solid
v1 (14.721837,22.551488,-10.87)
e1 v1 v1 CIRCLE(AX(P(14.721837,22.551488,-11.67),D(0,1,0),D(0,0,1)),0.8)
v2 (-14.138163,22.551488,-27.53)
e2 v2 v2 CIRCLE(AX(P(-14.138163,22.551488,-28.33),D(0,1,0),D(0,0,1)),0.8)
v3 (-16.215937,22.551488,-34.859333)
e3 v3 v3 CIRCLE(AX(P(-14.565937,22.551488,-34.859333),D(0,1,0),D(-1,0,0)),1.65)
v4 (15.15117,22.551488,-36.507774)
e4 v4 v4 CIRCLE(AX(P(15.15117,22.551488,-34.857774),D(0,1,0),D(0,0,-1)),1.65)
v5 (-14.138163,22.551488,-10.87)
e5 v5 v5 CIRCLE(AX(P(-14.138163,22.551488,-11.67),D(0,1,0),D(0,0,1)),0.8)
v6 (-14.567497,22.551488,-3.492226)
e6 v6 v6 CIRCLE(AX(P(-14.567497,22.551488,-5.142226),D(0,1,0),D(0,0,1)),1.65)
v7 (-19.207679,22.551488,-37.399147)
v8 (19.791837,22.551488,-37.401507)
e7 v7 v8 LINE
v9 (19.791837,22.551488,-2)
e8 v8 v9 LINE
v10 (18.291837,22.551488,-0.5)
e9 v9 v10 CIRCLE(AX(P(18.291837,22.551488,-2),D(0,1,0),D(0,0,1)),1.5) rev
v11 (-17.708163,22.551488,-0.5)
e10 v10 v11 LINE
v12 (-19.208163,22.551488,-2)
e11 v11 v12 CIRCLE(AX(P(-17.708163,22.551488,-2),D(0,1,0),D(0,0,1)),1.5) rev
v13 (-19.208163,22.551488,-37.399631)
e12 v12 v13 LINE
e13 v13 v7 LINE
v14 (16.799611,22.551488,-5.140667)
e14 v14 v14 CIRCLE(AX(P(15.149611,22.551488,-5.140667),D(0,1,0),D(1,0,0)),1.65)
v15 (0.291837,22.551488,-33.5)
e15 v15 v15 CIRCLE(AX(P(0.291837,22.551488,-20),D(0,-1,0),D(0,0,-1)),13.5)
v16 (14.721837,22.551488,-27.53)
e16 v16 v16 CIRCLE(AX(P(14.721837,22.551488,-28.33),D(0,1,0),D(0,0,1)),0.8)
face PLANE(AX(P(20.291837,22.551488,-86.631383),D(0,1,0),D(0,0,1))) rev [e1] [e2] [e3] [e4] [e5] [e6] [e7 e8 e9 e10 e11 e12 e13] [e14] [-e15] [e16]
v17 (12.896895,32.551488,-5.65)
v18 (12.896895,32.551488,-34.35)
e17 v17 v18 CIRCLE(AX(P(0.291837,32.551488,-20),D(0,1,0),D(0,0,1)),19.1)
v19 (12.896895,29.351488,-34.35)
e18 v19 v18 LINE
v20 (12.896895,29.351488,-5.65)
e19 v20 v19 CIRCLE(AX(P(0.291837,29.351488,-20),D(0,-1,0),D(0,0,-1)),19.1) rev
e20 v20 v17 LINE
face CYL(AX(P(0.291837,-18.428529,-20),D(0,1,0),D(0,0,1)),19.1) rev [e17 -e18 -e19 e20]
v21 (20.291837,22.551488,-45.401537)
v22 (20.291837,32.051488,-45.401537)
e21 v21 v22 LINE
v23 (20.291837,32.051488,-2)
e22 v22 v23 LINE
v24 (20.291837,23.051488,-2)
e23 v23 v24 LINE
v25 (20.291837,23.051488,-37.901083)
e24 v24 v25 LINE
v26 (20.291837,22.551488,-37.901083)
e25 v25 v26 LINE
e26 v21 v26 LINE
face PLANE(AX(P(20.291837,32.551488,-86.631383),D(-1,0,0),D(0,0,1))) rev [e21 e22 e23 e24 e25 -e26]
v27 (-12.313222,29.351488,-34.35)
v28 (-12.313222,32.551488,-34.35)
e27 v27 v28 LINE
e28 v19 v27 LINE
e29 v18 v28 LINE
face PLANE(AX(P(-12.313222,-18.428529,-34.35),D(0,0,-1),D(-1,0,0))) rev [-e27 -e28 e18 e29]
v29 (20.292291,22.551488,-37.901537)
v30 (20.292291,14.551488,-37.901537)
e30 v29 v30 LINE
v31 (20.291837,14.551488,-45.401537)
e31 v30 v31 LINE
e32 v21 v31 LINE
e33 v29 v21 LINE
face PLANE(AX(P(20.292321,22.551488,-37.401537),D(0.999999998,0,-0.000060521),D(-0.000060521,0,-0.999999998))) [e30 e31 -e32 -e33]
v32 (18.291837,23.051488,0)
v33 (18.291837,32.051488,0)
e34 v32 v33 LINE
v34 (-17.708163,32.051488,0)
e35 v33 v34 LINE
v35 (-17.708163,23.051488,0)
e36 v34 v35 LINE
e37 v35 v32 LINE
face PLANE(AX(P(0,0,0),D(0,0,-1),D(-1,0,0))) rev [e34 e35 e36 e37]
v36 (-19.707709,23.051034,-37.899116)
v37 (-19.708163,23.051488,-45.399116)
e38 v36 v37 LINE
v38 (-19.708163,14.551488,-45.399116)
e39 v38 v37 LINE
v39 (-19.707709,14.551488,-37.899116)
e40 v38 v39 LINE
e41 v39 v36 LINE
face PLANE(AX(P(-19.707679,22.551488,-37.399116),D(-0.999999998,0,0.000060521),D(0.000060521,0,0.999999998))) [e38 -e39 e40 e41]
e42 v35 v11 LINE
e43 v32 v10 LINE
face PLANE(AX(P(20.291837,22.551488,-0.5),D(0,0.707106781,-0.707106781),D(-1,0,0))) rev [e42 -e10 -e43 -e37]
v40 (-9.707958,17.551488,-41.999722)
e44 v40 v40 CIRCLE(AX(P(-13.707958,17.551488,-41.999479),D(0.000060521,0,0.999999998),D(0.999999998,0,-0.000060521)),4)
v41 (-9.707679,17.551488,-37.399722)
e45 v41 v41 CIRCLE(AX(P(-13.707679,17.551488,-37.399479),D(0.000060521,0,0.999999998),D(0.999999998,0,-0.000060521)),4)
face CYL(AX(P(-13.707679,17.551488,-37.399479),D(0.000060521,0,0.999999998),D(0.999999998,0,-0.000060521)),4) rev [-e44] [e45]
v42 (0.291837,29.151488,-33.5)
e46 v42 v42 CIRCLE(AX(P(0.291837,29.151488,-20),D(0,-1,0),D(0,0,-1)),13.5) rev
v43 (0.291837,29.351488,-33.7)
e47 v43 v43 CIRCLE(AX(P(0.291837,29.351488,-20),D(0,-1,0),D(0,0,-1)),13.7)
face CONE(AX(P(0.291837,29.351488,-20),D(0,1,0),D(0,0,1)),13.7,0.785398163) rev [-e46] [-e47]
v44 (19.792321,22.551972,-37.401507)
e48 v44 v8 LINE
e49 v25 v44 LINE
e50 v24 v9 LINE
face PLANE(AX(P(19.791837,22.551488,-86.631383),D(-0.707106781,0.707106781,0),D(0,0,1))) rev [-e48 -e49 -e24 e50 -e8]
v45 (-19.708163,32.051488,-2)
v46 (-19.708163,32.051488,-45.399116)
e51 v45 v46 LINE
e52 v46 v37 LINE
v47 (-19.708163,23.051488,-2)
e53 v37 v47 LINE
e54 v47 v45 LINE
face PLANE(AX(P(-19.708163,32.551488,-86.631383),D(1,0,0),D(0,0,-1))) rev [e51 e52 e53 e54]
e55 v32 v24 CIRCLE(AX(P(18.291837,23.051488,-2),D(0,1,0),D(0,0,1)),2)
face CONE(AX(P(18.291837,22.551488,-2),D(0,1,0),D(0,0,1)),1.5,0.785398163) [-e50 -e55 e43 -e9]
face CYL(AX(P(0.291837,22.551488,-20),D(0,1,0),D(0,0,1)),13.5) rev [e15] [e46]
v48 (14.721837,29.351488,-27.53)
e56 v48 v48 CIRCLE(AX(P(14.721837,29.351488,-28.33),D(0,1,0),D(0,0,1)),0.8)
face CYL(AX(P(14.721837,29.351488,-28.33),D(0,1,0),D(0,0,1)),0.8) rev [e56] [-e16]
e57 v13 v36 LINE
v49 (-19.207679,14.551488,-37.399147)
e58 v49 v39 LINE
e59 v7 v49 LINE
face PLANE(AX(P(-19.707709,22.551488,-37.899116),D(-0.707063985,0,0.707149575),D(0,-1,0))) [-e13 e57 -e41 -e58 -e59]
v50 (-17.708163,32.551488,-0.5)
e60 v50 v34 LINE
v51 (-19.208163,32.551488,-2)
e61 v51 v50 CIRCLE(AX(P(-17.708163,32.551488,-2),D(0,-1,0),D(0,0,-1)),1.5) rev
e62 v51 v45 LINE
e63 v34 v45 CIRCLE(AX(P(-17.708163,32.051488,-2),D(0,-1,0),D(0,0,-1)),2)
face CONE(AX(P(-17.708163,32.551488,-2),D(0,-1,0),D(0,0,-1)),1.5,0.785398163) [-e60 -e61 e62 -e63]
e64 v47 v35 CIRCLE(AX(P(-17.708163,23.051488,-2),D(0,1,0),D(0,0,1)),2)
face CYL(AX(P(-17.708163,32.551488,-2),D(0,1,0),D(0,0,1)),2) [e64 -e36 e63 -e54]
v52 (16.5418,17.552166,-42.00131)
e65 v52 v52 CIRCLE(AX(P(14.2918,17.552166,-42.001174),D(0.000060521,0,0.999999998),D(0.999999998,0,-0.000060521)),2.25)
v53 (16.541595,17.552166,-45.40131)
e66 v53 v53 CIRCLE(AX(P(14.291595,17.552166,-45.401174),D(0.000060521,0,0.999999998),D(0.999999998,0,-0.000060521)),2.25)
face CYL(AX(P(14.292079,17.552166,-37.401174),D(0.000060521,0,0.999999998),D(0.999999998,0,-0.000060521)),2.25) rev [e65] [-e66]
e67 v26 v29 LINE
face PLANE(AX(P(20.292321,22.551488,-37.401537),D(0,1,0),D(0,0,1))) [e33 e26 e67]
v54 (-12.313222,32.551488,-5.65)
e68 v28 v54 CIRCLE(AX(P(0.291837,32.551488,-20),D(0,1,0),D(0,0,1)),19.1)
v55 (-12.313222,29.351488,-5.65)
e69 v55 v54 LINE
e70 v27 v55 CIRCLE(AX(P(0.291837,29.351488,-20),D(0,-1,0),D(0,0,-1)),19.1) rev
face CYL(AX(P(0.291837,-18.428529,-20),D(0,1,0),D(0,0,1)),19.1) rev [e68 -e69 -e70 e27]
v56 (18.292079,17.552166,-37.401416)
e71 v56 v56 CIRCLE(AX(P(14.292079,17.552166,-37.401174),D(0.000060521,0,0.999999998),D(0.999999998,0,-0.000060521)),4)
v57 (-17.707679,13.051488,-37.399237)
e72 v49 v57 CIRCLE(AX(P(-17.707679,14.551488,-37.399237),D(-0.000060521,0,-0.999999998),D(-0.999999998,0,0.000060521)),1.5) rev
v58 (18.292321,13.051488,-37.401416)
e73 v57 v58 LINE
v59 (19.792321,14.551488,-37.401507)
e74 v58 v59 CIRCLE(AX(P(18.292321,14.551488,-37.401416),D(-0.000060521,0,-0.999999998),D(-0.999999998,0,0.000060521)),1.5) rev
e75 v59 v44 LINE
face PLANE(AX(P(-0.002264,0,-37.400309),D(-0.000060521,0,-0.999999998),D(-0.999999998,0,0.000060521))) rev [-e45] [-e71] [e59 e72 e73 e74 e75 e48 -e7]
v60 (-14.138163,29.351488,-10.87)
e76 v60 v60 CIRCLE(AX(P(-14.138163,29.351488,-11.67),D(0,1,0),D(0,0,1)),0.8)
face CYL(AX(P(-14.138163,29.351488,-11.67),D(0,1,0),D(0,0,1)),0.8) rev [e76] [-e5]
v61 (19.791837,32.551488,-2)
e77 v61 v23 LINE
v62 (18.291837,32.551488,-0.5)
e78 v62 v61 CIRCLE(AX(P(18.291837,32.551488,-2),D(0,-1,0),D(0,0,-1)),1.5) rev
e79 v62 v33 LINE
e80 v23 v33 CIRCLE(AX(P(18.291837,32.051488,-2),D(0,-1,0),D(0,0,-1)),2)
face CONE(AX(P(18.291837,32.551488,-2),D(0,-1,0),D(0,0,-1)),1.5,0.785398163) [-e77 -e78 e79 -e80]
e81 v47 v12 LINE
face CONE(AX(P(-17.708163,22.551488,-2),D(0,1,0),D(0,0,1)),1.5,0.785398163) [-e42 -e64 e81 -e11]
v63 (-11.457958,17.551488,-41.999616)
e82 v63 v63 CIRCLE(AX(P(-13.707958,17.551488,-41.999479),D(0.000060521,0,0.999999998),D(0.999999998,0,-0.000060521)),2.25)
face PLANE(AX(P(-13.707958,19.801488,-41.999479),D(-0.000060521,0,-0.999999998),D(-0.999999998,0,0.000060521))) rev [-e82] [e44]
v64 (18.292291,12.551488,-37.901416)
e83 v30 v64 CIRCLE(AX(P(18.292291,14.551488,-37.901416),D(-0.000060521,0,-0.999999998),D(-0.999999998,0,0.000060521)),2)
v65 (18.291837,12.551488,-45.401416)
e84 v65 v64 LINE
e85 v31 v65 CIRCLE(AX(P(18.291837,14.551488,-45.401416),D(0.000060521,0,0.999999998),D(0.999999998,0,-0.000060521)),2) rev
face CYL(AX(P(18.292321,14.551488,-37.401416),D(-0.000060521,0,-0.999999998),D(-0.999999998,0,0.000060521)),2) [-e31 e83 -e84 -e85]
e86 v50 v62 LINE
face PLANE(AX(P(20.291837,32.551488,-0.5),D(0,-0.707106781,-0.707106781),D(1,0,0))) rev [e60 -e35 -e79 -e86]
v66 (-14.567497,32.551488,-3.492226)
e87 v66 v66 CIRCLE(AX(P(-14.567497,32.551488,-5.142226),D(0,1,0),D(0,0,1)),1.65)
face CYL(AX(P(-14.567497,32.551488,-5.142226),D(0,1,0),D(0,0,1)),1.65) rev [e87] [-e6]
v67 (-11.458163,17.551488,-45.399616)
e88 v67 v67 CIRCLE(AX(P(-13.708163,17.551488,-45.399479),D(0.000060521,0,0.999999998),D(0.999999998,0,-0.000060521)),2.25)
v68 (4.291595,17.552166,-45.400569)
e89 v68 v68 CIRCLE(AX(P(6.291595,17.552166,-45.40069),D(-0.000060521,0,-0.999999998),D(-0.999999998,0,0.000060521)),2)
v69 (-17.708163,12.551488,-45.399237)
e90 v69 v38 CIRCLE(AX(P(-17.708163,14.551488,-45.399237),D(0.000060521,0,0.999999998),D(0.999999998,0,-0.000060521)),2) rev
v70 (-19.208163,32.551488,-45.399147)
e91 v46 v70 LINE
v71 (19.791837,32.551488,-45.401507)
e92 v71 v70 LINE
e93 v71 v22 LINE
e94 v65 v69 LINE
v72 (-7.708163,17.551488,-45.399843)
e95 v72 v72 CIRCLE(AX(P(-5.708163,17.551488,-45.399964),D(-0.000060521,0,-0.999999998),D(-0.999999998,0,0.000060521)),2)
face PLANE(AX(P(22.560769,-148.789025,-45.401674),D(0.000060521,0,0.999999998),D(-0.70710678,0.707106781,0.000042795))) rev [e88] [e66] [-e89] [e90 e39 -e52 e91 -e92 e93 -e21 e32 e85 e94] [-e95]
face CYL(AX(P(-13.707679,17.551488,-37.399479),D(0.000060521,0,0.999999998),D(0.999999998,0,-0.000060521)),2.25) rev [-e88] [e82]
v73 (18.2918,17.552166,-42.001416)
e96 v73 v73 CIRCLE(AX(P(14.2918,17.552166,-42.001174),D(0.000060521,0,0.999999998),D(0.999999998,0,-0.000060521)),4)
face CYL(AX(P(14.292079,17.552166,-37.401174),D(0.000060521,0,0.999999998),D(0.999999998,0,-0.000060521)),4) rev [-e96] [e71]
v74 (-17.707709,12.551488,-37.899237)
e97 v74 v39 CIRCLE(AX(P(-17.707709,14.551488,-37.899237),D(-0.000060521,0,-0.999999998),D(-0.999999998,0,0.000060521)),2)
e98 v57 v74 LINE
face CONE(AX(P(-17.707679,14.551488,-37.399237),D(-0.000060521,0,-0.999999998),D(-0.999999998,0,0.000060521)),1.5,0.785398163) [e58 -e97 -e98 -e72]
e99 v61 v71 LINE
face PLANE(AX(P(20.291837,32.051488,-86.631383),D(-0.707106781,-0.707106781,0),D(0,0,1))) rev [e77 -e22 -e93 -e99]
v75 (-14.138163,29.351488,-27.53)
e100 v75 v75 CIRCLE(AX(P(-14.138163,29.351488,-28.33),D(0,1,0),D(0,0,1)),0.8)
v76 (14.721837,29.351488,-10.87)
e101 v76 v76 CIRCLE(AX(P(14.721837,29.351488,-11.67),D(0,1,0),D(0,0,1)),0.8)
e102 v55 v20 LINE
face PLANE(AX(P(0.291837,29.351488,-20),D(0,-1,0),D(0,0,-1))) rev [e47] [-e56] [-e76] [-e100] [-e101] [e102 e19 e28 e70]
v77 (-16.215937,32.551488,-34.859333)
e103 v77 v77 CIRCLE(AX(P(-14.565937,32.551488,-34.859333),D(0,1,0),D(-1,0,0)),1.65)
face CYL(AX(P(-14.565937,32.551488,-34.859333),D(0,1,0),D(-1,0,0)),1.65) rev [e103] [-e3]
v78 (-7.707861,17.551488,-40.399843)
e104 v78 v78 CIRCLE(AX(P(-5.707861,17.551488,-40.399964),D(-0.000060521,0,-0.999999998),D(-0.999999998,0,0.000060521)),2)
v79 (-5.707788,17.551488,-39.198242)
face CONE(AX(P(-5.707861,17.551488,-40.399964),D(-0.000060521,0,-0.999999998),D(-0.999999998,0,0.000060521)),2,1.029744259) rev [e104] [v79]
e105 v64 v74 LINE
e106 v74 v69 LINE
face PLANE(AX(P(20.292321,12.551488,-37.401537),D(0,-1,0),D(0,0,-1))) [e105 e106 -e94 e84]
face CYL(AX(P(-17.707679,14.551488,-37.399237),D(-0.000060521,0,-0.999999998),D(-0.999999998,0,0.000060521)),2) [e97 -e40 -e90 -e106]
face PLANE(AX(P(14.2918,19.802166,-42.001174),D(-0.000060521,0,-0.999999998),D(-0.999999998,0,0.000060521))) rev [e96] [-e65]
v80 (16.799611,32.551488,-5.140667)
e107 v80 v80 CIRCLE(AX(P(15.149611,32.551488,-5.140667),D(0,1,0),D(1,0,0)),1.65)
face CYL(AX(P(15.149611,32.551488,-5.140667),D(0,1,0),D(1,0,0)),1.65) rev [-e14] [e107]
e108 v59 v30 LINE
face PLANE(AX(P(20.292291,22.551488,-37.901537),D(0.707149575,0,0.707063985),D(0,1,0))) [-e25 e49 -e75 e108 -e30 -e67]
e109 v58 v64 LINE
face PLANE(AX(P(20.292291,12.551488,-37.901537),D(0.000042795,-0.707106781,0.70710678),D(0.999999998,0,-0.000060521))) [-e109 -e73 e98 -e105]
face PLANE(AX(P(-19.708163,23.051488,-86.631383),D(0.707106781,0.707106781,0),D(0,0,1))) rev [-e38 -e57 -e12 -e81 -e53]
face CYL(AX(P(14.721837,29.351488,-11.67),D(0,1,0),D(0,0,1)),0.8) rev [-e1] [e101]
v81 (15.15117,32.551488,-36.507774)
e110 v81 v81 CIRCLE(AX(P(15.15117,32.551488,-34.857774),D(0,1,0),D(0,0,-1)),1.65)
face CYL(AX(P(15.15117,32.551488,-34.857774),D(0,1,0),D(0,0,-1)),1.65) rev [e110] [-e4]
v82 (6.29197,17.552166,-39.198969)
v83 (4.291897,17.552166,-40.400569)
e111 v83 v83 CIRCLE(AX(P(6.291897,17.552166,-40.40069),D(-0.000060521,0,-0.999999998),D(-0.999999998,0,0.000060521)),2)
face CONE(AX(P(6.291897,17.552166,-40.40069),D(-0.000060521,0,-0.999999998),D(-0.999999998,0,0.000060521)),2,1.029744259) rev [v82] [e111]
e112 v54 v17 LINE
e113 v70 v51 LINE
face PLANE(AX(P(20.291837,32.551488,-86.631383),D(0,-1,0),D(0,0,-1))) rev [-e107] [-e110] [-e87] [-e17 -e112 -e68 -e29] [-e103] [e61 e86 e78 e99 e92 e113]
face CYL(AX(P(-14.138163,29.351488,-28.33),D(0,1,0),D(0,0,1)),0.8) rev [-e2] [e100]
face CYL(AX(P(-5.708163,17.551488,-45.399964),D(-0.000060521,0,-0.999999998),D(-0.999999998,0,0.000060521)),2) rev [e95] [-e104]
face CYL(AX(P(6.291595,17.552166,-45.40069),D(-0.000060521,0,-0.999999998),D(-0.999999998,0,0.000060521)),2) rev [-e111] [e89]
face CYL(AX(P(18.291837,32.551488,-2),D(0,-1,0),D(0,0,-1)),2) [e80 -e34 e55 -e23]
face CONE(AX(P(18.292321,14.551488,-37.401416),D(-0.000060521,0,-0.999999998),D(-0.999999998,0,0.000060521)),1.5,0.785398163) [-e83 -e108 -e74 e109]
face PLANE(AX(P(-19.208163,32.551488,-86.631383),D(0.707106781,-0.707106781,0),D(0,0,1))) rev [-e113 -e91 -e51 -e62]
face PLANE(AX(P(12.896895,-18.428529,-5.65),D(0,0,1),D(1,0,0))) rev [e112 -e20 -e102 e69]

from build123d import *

# Parameters (mm, degrees)
EXTRUDE_START                = 22.551487981
EXTRUDE_1_DEPTH              = 10
SKETCH_3_R                   = 13.5
CUT_EXTRUDE_1_DEPTH          = 34.402382852
CUT_EXTRUDE_2_DEPTH          = 3.2
HOLE_WIZARD_M2_1_D           = 1.6
HOLE_WIZARD_M2_1_ON_FACE_2_D = 1.6
HOLE_WIZARD_M4_1_D           = 3.3
PATTERN_CIRCULAR_1_COUNT     = 4
FILLET_1_R                   = 2
CUT_EXTRUDE_3_DEPTH          = 3.2
SKETCH_14_W                  = 40.000000073
SKETCH_14_H                  = 10
EXTRUDE_3_DEPTH              = 8
HOLE_WIZARD_2_D              = 4.5
HOLE_WIZARD_2_CBORE_D        = 8
HOLE_WIZARD_2_CBORE_DEPTH    = 4.6
FILLET_3_R                   = 2
CHAMFER_3_SIZE               = 0.5
CHAMFER_4_SIZE               = 0.5
MM_1_D                       = 4
MM_1_DEPTH                   = 5
MM_1_TIP                     = 1.201721238
MM_1_ON_FACE_2_D             = 4
MM_1_ON_FACE_2_DEPTH         = 5
MM_1_ON_FACE_2_TIP           = 1.201721238
CHAMFER_5_SIZE               = 0.2


# Read off the part's stored shape, not the designer's step: 凸台-拉伸1
with BuildPart() as part:
    # 凸台-拉伸1 outline → 凸台-拉伸1 (new body)
    with BuildSketch(Plane(origin=(0, 0, 0), x_dir=(1, 0, 0), z_dir=(0, 1, 0)).offset(EXTRUDE_START)):
        Polygon((-19.708163337, 0), (20.291836663, 0), (20.291836663, 45.401537164), (-19.708163337, 45.399116322), align=None)
    extrude(amount=EXTRUDE_1_DEPTH)

    # 草图3 → 切除-拉伸1 (cut, through all)
    with BuildSketch(Plane(origin=(0, 32.551487981, -20.825928422), x_dir=(-1, 0, 0), z_dir=(0, -1, 0))):
        with Locations(Location((-0.291836663, -0.825928422, 0), (0, 0, 90))):
            Circle(SKETCH_3_R)
    extrude(amount=CUT_EXTRUDE_1_DEPTH, mode=Mode.SUBTRACT)

    # 草图6 → 切除-拉伸2 (cut)
    with BuildSketch(Plane(origin=(0, 32.551487981, -20.825928422), x_dir=(-1, 0, 0), z_dir=(0, -1, 0))):
        with BuildLine():
            Line((12.2943661, 13.474071578), (-12.878039427, 13.474071578))
            ThreePointArc((-12.878039427, 13.474071578), (-19.341836663, -0.825928422), (-12.878039427, -15.125928422))
            Line((-12.878039427, -15.125928422), (12.2943661, -15.125928422))
            ThreePointArc((12.2943661, -15.125928422), (18.758163337, -0.825928422), (12.2943661, 13.474071578))
        make_face()
    extrude(amount=CUT_EXTRUDE_2_DEPTH, mode=Mode.SUBTRACT)

    # M2 螺纹孔1 (through all)
    with Locations(Plane(origin=(14.721836663, 29.351487981, -11.67), x_dir=(0, 0, 1), z_dir=(0, 1, 0))):
        with Locations((0, 0), (-16.66, 0), (-16.66, -28.86), (0, -28.86)):
            Hole(HOLE_WIZARD_M2_1_D / 2)

    # M2 螺纹孔1 on face 2 (through all)
    with Locations(Plane(origin=(36.124820123, 11.946154634, 0), x_dir=(0, 0, 1), z_dir=(0, 1, 0))):
        with Locations((0, 0)):
            Hole(HOLE_WIZARD_M2_1_ON_FACE_2_D / 2)

    # M4 螺纹孔1 (through all)
    with Locations(Plane(origin=(-14.567496717, 32.551487981, -5.142225972), x_dir=(0, 0, 1), z_dir=(0, 1, 0))):
        with Locations((0, 0)):
            hole_wizard_m4_1 = Hole(HOLE_WIZARD_M4_1_D / 2)

    # 阵列(圆周)1: M4 螺纹孔1 ×4 about axis
    pattern_circular_1_axis = Axis((0.291836663, 0, -20), (0, 1, 0))
    for i in range(1, PATTERN_CIRCULAR_1_COUNT):
        add(hole_wizard_m4_1.rotate(pattern_circular_1_axis, i * 360 / PATTERN_CIRCULAR_1_COUNT), mode=Mode.SUBTRACT)

    # 圆角1
    fillet_1_edges = [part.edges().sort_by_distance(p)[0] for p in [
        (-19.708163337, 27.551487981, 0),
        (20.291836663, 27.551487981, 0),
    ]]
    fillet(fillet_1_edges, radius=FILLET_1_R)

    # 草图10 → 切除-拉伸3 (cut)
    with BuildSketch(Plane(origin=(0, 32.551487981, 0), x_dir=(1, 0, 0), z_dir=(0, 1, 0))):
        with BuildLine():
            Line((12.896895172, 5.65), (-12.313221845, 5.65))
            ThreePointArc((-12.313221845, 5.65), (-18.808163337, 20), (-12.313221845, 34.35))
            Line((-12.313221845, 34.35), (12.896895172, 34.35))
            ThreePointArc((12.896895172, 34.35), (19.391836663, 20), (12.896895172, 5.65))
        make_face()
        with BuildLine():
            Line((12.878039427, 5.7), (-12.2943661, 5.7))
            ThreePointArc((-12.2943661, 5.7), (-18.758163337, 20), (-12.2943661, 34.3))
            Line((-12.2943661, 34.3), (12.878039427, 34.3))
            ThreePointArc((12.878039427, 34.3), (19.341836663, 20), (12.878039427, 5.7))
        make_face(mode=Mode.SUBTRACT)
    extrude(amount=-CUT_EXTRUDE_3_DEPTH, mode=Mode.SUBTRACT)

    # 草图14 → 凸台-拉伸3 (add)
    with BuildSketch(Plane(origin=(-0.002747675, 0, -45.400308914), x_dir=(-0.999999998168601, 0, 6.0521054570844804e-05), z_dir=(-6.0521054570844804e-05, 0, -0.999999998168601))):
        with Locations((-0.294584339, 17.551487981)):
            Rectangle(SKETCH_14_W, SKETCH_14_H)
    extrude(amount=-EXTRUDE_3_DEPTH)

    # 打孔尺寸(%根据)内六角圆柱头螺钉的类型2 (through all)
    with Locations(Plane(origin=(-13.707679179, 17.551487981, -37.399479463), x_dir=(0.999999998169, 0, -6.0521055e-05), z_dir=(6.0521055e-05, 0, 0.999999998169))):
        with Locations((0, 0)):
            hole_wizard_2 = CounterBoreHole(HOLE_WIZARD_2_D / 2, HOLE_WIZARD_2_CBORE_D / 2, HOLE_WIZARD_2_CBORE_DEPTH)

    # 镜向1: 打孔尺寸(%根据)内六角圆柱头螺钉的类型2 across plane
    add(hole_wizard_2.mirror(Plane(origin=(0.29488819, 7.139e-06, -1.7847e-05), x_dir=(6.052105453537725e-05, 1.4651192230755134e-09, 0.999999998168601), z_dir=(0.9999999978755771, 2.420842186592359e-05, -6.052105455311136e-05))), mode=Mode.SUBTRACT)

    # 圆角3
    fillet_3_edges = [part.edges().sort_by_distance(p)[0] for p in [
        (20.292078748, 12.551487981, -41.401537171),
        (-19.707921252, 12.551487981, -41.399116329),
    ]]
    fillet(fillet_3_edges, radius=FILLET_3_R)

    # 倒角3
    # the kernel refuses this chamfer: 0.5 mm, written as the material it takes off along each edge
    with BuildSketch(Plane(origin=(20.292320832, 14.551487981, -37.401537179), x_dir=(-0.9996202510011412, 0, 0.027556374732822585), z_dir=(0, 1, 0))) as chamfer_3_piece_1:
        Polygon((CHAMFER_3_SIZE * 0.999621916911, -CHAMFER_3_SIZE * 0.0274958766106), (-CHAMFER_3_SIZE * 0.0274958766106, -CHAMFER_3_SIZE * 0.999621916911), (0, 0), align=None)
    extrude(amount=8, mode=Mode.SUBTRACT)
    with BuildSketch(Plane(origin=(-17.707679172, 12.551487981, -37.399237379), x_dir=(1.6640794488223208e-06, 0.9996219169112968, 0.027495876560227457), z_dir=(0.999999998168601, 0, -6.0521054570844804e-05))) as chamfer_3_piece_2:
        Polygon((CHAMFER_3_SIZE * 0.999621916911, -CHAMFER_3_SIZE * 0.0274958766106), (-CHAMFER_3_SIZE * 0.0274958766106, -CHAMFER_3_SIZE * 0.999621916911), (0, 0), align=None)
    extrude(amount=36.000000073, mode=Mode.SUBTRACT)
    with BuildSketch(Plane(origin=(-19.707679168, 22.551487981, -37.399116337), x_dir=(-0.027556374732808586, 0, -0.9996202510011414), z_dir=(0, -1, 0))) as chamfer_3_piece_3:
        Polygon((CHAMFER_3_SIZE * 0.999621916911, CHAMFER_3_SIZE * 0.0274958766106), (-CHAMFER_3_SIZE * 0.0274958766106, CHAMFER_3_SIZE * 0.999621916911), (0, 0), align=None)
    extrude(amount=8, mode=Mode.SUBTRACT)
    with BuildSketch(Plane(origin=(-17.707679172, 14.551487981, -37.399237379), x_dir=(-0.999999998168601, 0, 6.0521054571438526e-05), z_dir=(0, 1, 0))) as chamfer_3_piece_4:
        Polygon((2, -CHAMFER_3_SIZE), (2 - CHAMFER_3_SIZE, 0), (2, 0), align=None)
    revolve(axis=Axis((-17.707679172, 14.551487981, -37.399237379), (6.0521054570844804e-05, 0, 0.999999998168601)), revolution_arc=90, mode=Mode.SUBTRACT)
    with BuildSketch(Plane(origin=(18.292320836, 14.551487981, -37.401416137), x_dir=(0, -1, 0), z_dir=(-0.999999998168601, 0, 6.0521054570844804e-05))) as chamfer_3_piece_5:
        Polygon((2 - CHAMFER_3_SIZE, 0), (2, -CHAMFER_3_SIZE), (2, 0), align=None)
    revolve(axis=Axis((18.292320836, 14.551487981, -37.401416137), (6.0521054570844804e-05, 0, 0.999999998168601)), revolution_arc=90, mode=Mode.SUBTRACT)

    # 倒角4
    # the kernel refuses this chamfer: 0.5 mm, written as the material it takes off along each edge
    with BuildSketch(Plane(origin=(20.291836663, 22.551487981, -39.186924708), x_dir=(-0.9996219169112968, -0.027495876610589005, 3.063515239507053e-14), z_dir=(0, 1.1141726022756645e-12, 1.0))) as chamfer_4_piece_1_section:
        Polygon((CHAMFER_4_SIZE * 0.999621916911, -CHAMFER_4_SIZE * 0.0274958766106), (-CHAMFER_4_SIZE * 0.0274958766106, -CHAMFER_4_SIZE * 0.999621916911), (0, 0), align=None)
    chamfer_4_piece_1 = extrude(amount=37.186924708, mode=Mode.PRIVATE)
    chamfer_4_piece_1 = split(chamfer_4_piece_1, bisect_by=Plane(origin=(20.073247495, 22.739018286, -37.682467586), z_dir=(0.7071495747397631, 0, 0.7070639850433426)), keep=Keep.TOP, mode=Mode.PRIVATE)
    with BuildSketch(Plane(origin=(20.291836663, 22.551487981, -39.186924708), x_dir=(-0.9996219169112968, -0.027495876610589005, 3.063515239507053e-14), z_dir=(0, 1.1141726022756645e-12, 1.0))) as chamfer_4_piece_2_section:
        Polygon((CHAMFER_4_SIZE * 0.999621916911, -CHAMFER_4_SIZE * 0.0274958766106), (-CHAMFER_4_SIZE * 0.0274958766106, -CHAMFER_4_SIZE * 0.999621916911), (0, 0), align=None)
    chamfer_4_piece_2 = extrude(amount=37.186924708, mode=Mode.PRIVATE)
    chamfer_4_piece_2 = split(chamfer_4_piece_2, bisect_by=Plane(origin=(19.792078741, 22.551609023, -37.401506904), z_dir=(6.0521054570844804e-05, 0, 0.999999998168601)), keep=Keep.TOP, mode=Mode.PRIVATE)
    with BuildSketch(Plane(origin=(18.291836663, 22.551487981, -2), x_dir=(0, 0, 1), z_dir=(-1, 0, 0))) as chamfer_4_piece_3:
        Polygon((2 - CHAMFER_4_SIZE, 0), (2, CHAMFER_4_SIZE), (2, 0), align=None)
    chamfer_4_piece_3_solid = revolve(axis=Axis((18.291836663, 22.551487981, -2), (0, 1, 0)), revolution_arc=90, mode=Mode.PRIVATE)
    with BuildSketch(Plane(origin=(-17.708163337, 22.551487981, 0), x_dir=(0, -0.02749587661058908, -0.9996219169112968), z_dir=(1, 0, 0)), Plane(origin=(-17.708163337, 32.551487981, 0), x_dir=(0, -0.9996219169112968, 0.027495876610586483), z_dir=(1, 0, 0))) as chamfer_4_piece_4:
        Polygon((CHAMFER_4_SIZE * 0.999621916911, CHAMFER_4_SIZE * 0.0274958766106), (-CHAMFER_4_SIZE * 0.0274958766106, CHAMFER_4_SIZE * 0.999621916911), (0, 0), align=None)
    chamfer_4_piece_4_solid = extrude(amount=36, mode=Mode.PRIVATE)
    with BuildSketch(Plane(origin=(-17.708163337, 22.551487981, -2), x_dir=(0, 0, 1), z_dir=(1, 0, 0))) as chamfer_4_piece_5:
        Polygon((2 - CHAMFER_4_SIZE, 0), (2, -CHAMFER_4_SIZE), (2, 0), align=None)
    chamfer_4_piece_5_solid = revolve(axis=Axis((-17.708163337, 22.551487981, -2), (0, -1, 0)), revolution_arc=90, mode=Mode.PRIVATE)
    with BuildSketch(Plane(origin=(-19.708163337, 22.551487981, -46.684957816), x_dir=(0.9996219169112968, -0.027495876610589005, 0), z_dir=(0, 0, 1))) as chamfer_4_piece_6_section:
        Polygon((CHAMFER_4_SIZE * 0.999621916911, CHAMFER_4_SIZE * 0.0274958766106), (-CHAMFER_4_SIZE * 0.0274958766106, CHAMFER_4_SIZE * 0.999621916911), (0, 0), align=None)
    chamfer_4_piece_6 = extrude(amount=44.684957816, mode=Mode.PRIVATE)
    chamfer_4_piece_6 = split(chamfer_4_piece_6, bisect_by=Plane(origin=(-19.707860752, 22.801412311, -40.399458205), z_dir=(-0.999999998168601, 0, 6.0521054570844804e-05)), keep=Keep.TOP, mode=Mode.PRIVATE)
    with BuildSketch(Plane(origin=(-19.708163337, 22.551487981, -46.684957816), x_dir=(0.9996219169112968, -0.027495876610589005, 0), z_dir=(0, 0, 1))) as chamfer_4_piece_7_section:
        Polygon((CHAMFER_4_SIZE * 0.999621916911, CHAMFER_4_SIZE * 0.0274958766106), (-CHAMFER_4_SIZE * 0.0274958766106, CHAMFER_4_SIZE * 0.999621916911), (0, 0), align=None)
    chamfer_4_piece_7 = extrude(amount=44.684957816, mode=Mode.PRIVATE)
    chamfer_4_piece_7 = split(chamfer_4_piece_7, bisect_by=Plane(origin=(-10.80541075, 22.718313122, -28.997895145), z_dir=(-0.7070639850433426, 0, 0.7071495747397631)), keep=Keep.TOP, mode=Mode.PRIVATE)
    with BuildSketch(Plane(origin=(20.291836663, 32.551487981, -2), x_dir=(0.027495876610589196, -0.9996219169112968, 0), z_dir=(0, 0, -1))) as chamfer_4_piece_8:
        Polygon((CHAMFER_4_SIZE * 0.999621916911, CHAMFER_4_SIZE * 0.0274958766106), (-CHAMFER_4_SIZE * 0.0274958766106, CHAMFER_4_SIZE * 0.999621916911), (0, 0), align=None)
    chamfer_4_piece_8_solid = extrude(amount=44.687378658, mode=Mode.PRIVATE)
    with BuildSketch(Plane(origin=(18.291836663, 32.551487981, -2), x_dir=(0, 0, 1), z_dir=(-1, 0, 0))) as chamfer_4_piece_9:
        Polygon((2, -CHAMFER_4_SIZE), (2 - CHAMFER_4_SIZE, 0), (2, 0), align=None)
    chamfer_4_piece_9_solid = revolve(axis=Axis((18.291836663, 32.551487981, -2), (0, 1, 0)), revolution_arc=90, mode=Mode.PRIVATE)
    with BuildSketch(Plane(origin=(-17.708163337, 32.551487981, -2), x_dir=(0, 0, 1), z_dir=(1, 0, 0))) as chamfer_4_piece_10:
        Polygon((2, CHAMFER_4_SIZE), (2 - CHAMFER_4_SIZE, 0), (2, 0), align=None)
    chamfer_4_piece_10_solid = revolve(axis=Axis((-17.708163337, 32.551487981, -2), (0, -1, 0)), revolution_arc=90, mode=Mode.PRIVATE)
    with BuildSketch(Plane(origin=(-19.708163337, 32.551487981, -46.684957816), x_dir=(-0.027495876610589196, -0.9996219169112968, 0), z_dir=(0, 0, 1))) as chamfer_4_piece_11:
        Polygon((CHAMFER_4_SIZE * 0.999621916911, CHAMFER_4_SIZE * 0.0274958766106), (-CHAMFER_4_SIZE * 0.0274958766106, CHAMFER_4_SIZE * 0.999621916911), (0, 0), align=None)
    chamfer_4_piece_11_solid = extrude(amount=44.684957816, mode=Mode.PRIVATE)
    add([chamfer_4_piece_1, chamfer_4_piece_2, chamfer_4_piece_3_solid, chamfer_4_piece_4_solid, chamfer_4_piece_5_solid, chamfer_4_piece_6, chamfer_4_piece_7, chamfer_4_piece_8_solid, chamfer_4_piece_9_solid, chamfer_4_piece_10_solid, chamfer_4_piece_11_solid], mode=Mode.SUBTRACT)

    # 大小mm 暗销孔1
    with Locations(Plane(origin=(6.291594588, 17.552165811, -45.400689855), x_dir=(-0.999999998169, 0, 6.0521055e-05), z_dir=(-6.0521055e-05, 0, -0.999999998169))):
        with Locations((0, 0)):
            Hole(MM_1_D / 2, depth=MM_1_DEPTH)
            with Locations((0, 0, -(MM_1_DEPTH + MM_1_TIP / 2))):  # 118° drill point
                Cone(0, MM_1_D / 2, MM_1_TIP, mode=Mode.SUBTRACT)

    # 大小mm 暗销孔1 on face 2
    with Locations(Plane(origin=(-5.708163362, 17.551487981, -45.399963617), x_dir=(-0.99999999814, 0, 6.1e-05), z_dir=(-6.1e-05, 0, -0.99999999814))):
        with Locations((0, 0)):
            Hole(MM_1_ON_FACE_2_D / 2, depth=MM_1_ON_FACE_2_DEPTH)
            with Locations((0, 0, -(MM_1_ON_FACE_2_DEPTH + MM_1_ON_FACE_2_TIP / 2))):  # 118° drill point
                Cone(0, MM_1_ON_FACE_2_D / 2, MM_1_ON_FACE_2_TIP, mode=Mode.SUBTRACT)

    # 倒角5
    chamfer_5_edges = [part.edges().sort_by_distance(p)[0] for p in [
        (0.291836663, 29.351487981, -6.5),
    ]]
    chamfer(chamfer_5_edges, length=CHAMFER_5_SIZE)


solid = part.part
